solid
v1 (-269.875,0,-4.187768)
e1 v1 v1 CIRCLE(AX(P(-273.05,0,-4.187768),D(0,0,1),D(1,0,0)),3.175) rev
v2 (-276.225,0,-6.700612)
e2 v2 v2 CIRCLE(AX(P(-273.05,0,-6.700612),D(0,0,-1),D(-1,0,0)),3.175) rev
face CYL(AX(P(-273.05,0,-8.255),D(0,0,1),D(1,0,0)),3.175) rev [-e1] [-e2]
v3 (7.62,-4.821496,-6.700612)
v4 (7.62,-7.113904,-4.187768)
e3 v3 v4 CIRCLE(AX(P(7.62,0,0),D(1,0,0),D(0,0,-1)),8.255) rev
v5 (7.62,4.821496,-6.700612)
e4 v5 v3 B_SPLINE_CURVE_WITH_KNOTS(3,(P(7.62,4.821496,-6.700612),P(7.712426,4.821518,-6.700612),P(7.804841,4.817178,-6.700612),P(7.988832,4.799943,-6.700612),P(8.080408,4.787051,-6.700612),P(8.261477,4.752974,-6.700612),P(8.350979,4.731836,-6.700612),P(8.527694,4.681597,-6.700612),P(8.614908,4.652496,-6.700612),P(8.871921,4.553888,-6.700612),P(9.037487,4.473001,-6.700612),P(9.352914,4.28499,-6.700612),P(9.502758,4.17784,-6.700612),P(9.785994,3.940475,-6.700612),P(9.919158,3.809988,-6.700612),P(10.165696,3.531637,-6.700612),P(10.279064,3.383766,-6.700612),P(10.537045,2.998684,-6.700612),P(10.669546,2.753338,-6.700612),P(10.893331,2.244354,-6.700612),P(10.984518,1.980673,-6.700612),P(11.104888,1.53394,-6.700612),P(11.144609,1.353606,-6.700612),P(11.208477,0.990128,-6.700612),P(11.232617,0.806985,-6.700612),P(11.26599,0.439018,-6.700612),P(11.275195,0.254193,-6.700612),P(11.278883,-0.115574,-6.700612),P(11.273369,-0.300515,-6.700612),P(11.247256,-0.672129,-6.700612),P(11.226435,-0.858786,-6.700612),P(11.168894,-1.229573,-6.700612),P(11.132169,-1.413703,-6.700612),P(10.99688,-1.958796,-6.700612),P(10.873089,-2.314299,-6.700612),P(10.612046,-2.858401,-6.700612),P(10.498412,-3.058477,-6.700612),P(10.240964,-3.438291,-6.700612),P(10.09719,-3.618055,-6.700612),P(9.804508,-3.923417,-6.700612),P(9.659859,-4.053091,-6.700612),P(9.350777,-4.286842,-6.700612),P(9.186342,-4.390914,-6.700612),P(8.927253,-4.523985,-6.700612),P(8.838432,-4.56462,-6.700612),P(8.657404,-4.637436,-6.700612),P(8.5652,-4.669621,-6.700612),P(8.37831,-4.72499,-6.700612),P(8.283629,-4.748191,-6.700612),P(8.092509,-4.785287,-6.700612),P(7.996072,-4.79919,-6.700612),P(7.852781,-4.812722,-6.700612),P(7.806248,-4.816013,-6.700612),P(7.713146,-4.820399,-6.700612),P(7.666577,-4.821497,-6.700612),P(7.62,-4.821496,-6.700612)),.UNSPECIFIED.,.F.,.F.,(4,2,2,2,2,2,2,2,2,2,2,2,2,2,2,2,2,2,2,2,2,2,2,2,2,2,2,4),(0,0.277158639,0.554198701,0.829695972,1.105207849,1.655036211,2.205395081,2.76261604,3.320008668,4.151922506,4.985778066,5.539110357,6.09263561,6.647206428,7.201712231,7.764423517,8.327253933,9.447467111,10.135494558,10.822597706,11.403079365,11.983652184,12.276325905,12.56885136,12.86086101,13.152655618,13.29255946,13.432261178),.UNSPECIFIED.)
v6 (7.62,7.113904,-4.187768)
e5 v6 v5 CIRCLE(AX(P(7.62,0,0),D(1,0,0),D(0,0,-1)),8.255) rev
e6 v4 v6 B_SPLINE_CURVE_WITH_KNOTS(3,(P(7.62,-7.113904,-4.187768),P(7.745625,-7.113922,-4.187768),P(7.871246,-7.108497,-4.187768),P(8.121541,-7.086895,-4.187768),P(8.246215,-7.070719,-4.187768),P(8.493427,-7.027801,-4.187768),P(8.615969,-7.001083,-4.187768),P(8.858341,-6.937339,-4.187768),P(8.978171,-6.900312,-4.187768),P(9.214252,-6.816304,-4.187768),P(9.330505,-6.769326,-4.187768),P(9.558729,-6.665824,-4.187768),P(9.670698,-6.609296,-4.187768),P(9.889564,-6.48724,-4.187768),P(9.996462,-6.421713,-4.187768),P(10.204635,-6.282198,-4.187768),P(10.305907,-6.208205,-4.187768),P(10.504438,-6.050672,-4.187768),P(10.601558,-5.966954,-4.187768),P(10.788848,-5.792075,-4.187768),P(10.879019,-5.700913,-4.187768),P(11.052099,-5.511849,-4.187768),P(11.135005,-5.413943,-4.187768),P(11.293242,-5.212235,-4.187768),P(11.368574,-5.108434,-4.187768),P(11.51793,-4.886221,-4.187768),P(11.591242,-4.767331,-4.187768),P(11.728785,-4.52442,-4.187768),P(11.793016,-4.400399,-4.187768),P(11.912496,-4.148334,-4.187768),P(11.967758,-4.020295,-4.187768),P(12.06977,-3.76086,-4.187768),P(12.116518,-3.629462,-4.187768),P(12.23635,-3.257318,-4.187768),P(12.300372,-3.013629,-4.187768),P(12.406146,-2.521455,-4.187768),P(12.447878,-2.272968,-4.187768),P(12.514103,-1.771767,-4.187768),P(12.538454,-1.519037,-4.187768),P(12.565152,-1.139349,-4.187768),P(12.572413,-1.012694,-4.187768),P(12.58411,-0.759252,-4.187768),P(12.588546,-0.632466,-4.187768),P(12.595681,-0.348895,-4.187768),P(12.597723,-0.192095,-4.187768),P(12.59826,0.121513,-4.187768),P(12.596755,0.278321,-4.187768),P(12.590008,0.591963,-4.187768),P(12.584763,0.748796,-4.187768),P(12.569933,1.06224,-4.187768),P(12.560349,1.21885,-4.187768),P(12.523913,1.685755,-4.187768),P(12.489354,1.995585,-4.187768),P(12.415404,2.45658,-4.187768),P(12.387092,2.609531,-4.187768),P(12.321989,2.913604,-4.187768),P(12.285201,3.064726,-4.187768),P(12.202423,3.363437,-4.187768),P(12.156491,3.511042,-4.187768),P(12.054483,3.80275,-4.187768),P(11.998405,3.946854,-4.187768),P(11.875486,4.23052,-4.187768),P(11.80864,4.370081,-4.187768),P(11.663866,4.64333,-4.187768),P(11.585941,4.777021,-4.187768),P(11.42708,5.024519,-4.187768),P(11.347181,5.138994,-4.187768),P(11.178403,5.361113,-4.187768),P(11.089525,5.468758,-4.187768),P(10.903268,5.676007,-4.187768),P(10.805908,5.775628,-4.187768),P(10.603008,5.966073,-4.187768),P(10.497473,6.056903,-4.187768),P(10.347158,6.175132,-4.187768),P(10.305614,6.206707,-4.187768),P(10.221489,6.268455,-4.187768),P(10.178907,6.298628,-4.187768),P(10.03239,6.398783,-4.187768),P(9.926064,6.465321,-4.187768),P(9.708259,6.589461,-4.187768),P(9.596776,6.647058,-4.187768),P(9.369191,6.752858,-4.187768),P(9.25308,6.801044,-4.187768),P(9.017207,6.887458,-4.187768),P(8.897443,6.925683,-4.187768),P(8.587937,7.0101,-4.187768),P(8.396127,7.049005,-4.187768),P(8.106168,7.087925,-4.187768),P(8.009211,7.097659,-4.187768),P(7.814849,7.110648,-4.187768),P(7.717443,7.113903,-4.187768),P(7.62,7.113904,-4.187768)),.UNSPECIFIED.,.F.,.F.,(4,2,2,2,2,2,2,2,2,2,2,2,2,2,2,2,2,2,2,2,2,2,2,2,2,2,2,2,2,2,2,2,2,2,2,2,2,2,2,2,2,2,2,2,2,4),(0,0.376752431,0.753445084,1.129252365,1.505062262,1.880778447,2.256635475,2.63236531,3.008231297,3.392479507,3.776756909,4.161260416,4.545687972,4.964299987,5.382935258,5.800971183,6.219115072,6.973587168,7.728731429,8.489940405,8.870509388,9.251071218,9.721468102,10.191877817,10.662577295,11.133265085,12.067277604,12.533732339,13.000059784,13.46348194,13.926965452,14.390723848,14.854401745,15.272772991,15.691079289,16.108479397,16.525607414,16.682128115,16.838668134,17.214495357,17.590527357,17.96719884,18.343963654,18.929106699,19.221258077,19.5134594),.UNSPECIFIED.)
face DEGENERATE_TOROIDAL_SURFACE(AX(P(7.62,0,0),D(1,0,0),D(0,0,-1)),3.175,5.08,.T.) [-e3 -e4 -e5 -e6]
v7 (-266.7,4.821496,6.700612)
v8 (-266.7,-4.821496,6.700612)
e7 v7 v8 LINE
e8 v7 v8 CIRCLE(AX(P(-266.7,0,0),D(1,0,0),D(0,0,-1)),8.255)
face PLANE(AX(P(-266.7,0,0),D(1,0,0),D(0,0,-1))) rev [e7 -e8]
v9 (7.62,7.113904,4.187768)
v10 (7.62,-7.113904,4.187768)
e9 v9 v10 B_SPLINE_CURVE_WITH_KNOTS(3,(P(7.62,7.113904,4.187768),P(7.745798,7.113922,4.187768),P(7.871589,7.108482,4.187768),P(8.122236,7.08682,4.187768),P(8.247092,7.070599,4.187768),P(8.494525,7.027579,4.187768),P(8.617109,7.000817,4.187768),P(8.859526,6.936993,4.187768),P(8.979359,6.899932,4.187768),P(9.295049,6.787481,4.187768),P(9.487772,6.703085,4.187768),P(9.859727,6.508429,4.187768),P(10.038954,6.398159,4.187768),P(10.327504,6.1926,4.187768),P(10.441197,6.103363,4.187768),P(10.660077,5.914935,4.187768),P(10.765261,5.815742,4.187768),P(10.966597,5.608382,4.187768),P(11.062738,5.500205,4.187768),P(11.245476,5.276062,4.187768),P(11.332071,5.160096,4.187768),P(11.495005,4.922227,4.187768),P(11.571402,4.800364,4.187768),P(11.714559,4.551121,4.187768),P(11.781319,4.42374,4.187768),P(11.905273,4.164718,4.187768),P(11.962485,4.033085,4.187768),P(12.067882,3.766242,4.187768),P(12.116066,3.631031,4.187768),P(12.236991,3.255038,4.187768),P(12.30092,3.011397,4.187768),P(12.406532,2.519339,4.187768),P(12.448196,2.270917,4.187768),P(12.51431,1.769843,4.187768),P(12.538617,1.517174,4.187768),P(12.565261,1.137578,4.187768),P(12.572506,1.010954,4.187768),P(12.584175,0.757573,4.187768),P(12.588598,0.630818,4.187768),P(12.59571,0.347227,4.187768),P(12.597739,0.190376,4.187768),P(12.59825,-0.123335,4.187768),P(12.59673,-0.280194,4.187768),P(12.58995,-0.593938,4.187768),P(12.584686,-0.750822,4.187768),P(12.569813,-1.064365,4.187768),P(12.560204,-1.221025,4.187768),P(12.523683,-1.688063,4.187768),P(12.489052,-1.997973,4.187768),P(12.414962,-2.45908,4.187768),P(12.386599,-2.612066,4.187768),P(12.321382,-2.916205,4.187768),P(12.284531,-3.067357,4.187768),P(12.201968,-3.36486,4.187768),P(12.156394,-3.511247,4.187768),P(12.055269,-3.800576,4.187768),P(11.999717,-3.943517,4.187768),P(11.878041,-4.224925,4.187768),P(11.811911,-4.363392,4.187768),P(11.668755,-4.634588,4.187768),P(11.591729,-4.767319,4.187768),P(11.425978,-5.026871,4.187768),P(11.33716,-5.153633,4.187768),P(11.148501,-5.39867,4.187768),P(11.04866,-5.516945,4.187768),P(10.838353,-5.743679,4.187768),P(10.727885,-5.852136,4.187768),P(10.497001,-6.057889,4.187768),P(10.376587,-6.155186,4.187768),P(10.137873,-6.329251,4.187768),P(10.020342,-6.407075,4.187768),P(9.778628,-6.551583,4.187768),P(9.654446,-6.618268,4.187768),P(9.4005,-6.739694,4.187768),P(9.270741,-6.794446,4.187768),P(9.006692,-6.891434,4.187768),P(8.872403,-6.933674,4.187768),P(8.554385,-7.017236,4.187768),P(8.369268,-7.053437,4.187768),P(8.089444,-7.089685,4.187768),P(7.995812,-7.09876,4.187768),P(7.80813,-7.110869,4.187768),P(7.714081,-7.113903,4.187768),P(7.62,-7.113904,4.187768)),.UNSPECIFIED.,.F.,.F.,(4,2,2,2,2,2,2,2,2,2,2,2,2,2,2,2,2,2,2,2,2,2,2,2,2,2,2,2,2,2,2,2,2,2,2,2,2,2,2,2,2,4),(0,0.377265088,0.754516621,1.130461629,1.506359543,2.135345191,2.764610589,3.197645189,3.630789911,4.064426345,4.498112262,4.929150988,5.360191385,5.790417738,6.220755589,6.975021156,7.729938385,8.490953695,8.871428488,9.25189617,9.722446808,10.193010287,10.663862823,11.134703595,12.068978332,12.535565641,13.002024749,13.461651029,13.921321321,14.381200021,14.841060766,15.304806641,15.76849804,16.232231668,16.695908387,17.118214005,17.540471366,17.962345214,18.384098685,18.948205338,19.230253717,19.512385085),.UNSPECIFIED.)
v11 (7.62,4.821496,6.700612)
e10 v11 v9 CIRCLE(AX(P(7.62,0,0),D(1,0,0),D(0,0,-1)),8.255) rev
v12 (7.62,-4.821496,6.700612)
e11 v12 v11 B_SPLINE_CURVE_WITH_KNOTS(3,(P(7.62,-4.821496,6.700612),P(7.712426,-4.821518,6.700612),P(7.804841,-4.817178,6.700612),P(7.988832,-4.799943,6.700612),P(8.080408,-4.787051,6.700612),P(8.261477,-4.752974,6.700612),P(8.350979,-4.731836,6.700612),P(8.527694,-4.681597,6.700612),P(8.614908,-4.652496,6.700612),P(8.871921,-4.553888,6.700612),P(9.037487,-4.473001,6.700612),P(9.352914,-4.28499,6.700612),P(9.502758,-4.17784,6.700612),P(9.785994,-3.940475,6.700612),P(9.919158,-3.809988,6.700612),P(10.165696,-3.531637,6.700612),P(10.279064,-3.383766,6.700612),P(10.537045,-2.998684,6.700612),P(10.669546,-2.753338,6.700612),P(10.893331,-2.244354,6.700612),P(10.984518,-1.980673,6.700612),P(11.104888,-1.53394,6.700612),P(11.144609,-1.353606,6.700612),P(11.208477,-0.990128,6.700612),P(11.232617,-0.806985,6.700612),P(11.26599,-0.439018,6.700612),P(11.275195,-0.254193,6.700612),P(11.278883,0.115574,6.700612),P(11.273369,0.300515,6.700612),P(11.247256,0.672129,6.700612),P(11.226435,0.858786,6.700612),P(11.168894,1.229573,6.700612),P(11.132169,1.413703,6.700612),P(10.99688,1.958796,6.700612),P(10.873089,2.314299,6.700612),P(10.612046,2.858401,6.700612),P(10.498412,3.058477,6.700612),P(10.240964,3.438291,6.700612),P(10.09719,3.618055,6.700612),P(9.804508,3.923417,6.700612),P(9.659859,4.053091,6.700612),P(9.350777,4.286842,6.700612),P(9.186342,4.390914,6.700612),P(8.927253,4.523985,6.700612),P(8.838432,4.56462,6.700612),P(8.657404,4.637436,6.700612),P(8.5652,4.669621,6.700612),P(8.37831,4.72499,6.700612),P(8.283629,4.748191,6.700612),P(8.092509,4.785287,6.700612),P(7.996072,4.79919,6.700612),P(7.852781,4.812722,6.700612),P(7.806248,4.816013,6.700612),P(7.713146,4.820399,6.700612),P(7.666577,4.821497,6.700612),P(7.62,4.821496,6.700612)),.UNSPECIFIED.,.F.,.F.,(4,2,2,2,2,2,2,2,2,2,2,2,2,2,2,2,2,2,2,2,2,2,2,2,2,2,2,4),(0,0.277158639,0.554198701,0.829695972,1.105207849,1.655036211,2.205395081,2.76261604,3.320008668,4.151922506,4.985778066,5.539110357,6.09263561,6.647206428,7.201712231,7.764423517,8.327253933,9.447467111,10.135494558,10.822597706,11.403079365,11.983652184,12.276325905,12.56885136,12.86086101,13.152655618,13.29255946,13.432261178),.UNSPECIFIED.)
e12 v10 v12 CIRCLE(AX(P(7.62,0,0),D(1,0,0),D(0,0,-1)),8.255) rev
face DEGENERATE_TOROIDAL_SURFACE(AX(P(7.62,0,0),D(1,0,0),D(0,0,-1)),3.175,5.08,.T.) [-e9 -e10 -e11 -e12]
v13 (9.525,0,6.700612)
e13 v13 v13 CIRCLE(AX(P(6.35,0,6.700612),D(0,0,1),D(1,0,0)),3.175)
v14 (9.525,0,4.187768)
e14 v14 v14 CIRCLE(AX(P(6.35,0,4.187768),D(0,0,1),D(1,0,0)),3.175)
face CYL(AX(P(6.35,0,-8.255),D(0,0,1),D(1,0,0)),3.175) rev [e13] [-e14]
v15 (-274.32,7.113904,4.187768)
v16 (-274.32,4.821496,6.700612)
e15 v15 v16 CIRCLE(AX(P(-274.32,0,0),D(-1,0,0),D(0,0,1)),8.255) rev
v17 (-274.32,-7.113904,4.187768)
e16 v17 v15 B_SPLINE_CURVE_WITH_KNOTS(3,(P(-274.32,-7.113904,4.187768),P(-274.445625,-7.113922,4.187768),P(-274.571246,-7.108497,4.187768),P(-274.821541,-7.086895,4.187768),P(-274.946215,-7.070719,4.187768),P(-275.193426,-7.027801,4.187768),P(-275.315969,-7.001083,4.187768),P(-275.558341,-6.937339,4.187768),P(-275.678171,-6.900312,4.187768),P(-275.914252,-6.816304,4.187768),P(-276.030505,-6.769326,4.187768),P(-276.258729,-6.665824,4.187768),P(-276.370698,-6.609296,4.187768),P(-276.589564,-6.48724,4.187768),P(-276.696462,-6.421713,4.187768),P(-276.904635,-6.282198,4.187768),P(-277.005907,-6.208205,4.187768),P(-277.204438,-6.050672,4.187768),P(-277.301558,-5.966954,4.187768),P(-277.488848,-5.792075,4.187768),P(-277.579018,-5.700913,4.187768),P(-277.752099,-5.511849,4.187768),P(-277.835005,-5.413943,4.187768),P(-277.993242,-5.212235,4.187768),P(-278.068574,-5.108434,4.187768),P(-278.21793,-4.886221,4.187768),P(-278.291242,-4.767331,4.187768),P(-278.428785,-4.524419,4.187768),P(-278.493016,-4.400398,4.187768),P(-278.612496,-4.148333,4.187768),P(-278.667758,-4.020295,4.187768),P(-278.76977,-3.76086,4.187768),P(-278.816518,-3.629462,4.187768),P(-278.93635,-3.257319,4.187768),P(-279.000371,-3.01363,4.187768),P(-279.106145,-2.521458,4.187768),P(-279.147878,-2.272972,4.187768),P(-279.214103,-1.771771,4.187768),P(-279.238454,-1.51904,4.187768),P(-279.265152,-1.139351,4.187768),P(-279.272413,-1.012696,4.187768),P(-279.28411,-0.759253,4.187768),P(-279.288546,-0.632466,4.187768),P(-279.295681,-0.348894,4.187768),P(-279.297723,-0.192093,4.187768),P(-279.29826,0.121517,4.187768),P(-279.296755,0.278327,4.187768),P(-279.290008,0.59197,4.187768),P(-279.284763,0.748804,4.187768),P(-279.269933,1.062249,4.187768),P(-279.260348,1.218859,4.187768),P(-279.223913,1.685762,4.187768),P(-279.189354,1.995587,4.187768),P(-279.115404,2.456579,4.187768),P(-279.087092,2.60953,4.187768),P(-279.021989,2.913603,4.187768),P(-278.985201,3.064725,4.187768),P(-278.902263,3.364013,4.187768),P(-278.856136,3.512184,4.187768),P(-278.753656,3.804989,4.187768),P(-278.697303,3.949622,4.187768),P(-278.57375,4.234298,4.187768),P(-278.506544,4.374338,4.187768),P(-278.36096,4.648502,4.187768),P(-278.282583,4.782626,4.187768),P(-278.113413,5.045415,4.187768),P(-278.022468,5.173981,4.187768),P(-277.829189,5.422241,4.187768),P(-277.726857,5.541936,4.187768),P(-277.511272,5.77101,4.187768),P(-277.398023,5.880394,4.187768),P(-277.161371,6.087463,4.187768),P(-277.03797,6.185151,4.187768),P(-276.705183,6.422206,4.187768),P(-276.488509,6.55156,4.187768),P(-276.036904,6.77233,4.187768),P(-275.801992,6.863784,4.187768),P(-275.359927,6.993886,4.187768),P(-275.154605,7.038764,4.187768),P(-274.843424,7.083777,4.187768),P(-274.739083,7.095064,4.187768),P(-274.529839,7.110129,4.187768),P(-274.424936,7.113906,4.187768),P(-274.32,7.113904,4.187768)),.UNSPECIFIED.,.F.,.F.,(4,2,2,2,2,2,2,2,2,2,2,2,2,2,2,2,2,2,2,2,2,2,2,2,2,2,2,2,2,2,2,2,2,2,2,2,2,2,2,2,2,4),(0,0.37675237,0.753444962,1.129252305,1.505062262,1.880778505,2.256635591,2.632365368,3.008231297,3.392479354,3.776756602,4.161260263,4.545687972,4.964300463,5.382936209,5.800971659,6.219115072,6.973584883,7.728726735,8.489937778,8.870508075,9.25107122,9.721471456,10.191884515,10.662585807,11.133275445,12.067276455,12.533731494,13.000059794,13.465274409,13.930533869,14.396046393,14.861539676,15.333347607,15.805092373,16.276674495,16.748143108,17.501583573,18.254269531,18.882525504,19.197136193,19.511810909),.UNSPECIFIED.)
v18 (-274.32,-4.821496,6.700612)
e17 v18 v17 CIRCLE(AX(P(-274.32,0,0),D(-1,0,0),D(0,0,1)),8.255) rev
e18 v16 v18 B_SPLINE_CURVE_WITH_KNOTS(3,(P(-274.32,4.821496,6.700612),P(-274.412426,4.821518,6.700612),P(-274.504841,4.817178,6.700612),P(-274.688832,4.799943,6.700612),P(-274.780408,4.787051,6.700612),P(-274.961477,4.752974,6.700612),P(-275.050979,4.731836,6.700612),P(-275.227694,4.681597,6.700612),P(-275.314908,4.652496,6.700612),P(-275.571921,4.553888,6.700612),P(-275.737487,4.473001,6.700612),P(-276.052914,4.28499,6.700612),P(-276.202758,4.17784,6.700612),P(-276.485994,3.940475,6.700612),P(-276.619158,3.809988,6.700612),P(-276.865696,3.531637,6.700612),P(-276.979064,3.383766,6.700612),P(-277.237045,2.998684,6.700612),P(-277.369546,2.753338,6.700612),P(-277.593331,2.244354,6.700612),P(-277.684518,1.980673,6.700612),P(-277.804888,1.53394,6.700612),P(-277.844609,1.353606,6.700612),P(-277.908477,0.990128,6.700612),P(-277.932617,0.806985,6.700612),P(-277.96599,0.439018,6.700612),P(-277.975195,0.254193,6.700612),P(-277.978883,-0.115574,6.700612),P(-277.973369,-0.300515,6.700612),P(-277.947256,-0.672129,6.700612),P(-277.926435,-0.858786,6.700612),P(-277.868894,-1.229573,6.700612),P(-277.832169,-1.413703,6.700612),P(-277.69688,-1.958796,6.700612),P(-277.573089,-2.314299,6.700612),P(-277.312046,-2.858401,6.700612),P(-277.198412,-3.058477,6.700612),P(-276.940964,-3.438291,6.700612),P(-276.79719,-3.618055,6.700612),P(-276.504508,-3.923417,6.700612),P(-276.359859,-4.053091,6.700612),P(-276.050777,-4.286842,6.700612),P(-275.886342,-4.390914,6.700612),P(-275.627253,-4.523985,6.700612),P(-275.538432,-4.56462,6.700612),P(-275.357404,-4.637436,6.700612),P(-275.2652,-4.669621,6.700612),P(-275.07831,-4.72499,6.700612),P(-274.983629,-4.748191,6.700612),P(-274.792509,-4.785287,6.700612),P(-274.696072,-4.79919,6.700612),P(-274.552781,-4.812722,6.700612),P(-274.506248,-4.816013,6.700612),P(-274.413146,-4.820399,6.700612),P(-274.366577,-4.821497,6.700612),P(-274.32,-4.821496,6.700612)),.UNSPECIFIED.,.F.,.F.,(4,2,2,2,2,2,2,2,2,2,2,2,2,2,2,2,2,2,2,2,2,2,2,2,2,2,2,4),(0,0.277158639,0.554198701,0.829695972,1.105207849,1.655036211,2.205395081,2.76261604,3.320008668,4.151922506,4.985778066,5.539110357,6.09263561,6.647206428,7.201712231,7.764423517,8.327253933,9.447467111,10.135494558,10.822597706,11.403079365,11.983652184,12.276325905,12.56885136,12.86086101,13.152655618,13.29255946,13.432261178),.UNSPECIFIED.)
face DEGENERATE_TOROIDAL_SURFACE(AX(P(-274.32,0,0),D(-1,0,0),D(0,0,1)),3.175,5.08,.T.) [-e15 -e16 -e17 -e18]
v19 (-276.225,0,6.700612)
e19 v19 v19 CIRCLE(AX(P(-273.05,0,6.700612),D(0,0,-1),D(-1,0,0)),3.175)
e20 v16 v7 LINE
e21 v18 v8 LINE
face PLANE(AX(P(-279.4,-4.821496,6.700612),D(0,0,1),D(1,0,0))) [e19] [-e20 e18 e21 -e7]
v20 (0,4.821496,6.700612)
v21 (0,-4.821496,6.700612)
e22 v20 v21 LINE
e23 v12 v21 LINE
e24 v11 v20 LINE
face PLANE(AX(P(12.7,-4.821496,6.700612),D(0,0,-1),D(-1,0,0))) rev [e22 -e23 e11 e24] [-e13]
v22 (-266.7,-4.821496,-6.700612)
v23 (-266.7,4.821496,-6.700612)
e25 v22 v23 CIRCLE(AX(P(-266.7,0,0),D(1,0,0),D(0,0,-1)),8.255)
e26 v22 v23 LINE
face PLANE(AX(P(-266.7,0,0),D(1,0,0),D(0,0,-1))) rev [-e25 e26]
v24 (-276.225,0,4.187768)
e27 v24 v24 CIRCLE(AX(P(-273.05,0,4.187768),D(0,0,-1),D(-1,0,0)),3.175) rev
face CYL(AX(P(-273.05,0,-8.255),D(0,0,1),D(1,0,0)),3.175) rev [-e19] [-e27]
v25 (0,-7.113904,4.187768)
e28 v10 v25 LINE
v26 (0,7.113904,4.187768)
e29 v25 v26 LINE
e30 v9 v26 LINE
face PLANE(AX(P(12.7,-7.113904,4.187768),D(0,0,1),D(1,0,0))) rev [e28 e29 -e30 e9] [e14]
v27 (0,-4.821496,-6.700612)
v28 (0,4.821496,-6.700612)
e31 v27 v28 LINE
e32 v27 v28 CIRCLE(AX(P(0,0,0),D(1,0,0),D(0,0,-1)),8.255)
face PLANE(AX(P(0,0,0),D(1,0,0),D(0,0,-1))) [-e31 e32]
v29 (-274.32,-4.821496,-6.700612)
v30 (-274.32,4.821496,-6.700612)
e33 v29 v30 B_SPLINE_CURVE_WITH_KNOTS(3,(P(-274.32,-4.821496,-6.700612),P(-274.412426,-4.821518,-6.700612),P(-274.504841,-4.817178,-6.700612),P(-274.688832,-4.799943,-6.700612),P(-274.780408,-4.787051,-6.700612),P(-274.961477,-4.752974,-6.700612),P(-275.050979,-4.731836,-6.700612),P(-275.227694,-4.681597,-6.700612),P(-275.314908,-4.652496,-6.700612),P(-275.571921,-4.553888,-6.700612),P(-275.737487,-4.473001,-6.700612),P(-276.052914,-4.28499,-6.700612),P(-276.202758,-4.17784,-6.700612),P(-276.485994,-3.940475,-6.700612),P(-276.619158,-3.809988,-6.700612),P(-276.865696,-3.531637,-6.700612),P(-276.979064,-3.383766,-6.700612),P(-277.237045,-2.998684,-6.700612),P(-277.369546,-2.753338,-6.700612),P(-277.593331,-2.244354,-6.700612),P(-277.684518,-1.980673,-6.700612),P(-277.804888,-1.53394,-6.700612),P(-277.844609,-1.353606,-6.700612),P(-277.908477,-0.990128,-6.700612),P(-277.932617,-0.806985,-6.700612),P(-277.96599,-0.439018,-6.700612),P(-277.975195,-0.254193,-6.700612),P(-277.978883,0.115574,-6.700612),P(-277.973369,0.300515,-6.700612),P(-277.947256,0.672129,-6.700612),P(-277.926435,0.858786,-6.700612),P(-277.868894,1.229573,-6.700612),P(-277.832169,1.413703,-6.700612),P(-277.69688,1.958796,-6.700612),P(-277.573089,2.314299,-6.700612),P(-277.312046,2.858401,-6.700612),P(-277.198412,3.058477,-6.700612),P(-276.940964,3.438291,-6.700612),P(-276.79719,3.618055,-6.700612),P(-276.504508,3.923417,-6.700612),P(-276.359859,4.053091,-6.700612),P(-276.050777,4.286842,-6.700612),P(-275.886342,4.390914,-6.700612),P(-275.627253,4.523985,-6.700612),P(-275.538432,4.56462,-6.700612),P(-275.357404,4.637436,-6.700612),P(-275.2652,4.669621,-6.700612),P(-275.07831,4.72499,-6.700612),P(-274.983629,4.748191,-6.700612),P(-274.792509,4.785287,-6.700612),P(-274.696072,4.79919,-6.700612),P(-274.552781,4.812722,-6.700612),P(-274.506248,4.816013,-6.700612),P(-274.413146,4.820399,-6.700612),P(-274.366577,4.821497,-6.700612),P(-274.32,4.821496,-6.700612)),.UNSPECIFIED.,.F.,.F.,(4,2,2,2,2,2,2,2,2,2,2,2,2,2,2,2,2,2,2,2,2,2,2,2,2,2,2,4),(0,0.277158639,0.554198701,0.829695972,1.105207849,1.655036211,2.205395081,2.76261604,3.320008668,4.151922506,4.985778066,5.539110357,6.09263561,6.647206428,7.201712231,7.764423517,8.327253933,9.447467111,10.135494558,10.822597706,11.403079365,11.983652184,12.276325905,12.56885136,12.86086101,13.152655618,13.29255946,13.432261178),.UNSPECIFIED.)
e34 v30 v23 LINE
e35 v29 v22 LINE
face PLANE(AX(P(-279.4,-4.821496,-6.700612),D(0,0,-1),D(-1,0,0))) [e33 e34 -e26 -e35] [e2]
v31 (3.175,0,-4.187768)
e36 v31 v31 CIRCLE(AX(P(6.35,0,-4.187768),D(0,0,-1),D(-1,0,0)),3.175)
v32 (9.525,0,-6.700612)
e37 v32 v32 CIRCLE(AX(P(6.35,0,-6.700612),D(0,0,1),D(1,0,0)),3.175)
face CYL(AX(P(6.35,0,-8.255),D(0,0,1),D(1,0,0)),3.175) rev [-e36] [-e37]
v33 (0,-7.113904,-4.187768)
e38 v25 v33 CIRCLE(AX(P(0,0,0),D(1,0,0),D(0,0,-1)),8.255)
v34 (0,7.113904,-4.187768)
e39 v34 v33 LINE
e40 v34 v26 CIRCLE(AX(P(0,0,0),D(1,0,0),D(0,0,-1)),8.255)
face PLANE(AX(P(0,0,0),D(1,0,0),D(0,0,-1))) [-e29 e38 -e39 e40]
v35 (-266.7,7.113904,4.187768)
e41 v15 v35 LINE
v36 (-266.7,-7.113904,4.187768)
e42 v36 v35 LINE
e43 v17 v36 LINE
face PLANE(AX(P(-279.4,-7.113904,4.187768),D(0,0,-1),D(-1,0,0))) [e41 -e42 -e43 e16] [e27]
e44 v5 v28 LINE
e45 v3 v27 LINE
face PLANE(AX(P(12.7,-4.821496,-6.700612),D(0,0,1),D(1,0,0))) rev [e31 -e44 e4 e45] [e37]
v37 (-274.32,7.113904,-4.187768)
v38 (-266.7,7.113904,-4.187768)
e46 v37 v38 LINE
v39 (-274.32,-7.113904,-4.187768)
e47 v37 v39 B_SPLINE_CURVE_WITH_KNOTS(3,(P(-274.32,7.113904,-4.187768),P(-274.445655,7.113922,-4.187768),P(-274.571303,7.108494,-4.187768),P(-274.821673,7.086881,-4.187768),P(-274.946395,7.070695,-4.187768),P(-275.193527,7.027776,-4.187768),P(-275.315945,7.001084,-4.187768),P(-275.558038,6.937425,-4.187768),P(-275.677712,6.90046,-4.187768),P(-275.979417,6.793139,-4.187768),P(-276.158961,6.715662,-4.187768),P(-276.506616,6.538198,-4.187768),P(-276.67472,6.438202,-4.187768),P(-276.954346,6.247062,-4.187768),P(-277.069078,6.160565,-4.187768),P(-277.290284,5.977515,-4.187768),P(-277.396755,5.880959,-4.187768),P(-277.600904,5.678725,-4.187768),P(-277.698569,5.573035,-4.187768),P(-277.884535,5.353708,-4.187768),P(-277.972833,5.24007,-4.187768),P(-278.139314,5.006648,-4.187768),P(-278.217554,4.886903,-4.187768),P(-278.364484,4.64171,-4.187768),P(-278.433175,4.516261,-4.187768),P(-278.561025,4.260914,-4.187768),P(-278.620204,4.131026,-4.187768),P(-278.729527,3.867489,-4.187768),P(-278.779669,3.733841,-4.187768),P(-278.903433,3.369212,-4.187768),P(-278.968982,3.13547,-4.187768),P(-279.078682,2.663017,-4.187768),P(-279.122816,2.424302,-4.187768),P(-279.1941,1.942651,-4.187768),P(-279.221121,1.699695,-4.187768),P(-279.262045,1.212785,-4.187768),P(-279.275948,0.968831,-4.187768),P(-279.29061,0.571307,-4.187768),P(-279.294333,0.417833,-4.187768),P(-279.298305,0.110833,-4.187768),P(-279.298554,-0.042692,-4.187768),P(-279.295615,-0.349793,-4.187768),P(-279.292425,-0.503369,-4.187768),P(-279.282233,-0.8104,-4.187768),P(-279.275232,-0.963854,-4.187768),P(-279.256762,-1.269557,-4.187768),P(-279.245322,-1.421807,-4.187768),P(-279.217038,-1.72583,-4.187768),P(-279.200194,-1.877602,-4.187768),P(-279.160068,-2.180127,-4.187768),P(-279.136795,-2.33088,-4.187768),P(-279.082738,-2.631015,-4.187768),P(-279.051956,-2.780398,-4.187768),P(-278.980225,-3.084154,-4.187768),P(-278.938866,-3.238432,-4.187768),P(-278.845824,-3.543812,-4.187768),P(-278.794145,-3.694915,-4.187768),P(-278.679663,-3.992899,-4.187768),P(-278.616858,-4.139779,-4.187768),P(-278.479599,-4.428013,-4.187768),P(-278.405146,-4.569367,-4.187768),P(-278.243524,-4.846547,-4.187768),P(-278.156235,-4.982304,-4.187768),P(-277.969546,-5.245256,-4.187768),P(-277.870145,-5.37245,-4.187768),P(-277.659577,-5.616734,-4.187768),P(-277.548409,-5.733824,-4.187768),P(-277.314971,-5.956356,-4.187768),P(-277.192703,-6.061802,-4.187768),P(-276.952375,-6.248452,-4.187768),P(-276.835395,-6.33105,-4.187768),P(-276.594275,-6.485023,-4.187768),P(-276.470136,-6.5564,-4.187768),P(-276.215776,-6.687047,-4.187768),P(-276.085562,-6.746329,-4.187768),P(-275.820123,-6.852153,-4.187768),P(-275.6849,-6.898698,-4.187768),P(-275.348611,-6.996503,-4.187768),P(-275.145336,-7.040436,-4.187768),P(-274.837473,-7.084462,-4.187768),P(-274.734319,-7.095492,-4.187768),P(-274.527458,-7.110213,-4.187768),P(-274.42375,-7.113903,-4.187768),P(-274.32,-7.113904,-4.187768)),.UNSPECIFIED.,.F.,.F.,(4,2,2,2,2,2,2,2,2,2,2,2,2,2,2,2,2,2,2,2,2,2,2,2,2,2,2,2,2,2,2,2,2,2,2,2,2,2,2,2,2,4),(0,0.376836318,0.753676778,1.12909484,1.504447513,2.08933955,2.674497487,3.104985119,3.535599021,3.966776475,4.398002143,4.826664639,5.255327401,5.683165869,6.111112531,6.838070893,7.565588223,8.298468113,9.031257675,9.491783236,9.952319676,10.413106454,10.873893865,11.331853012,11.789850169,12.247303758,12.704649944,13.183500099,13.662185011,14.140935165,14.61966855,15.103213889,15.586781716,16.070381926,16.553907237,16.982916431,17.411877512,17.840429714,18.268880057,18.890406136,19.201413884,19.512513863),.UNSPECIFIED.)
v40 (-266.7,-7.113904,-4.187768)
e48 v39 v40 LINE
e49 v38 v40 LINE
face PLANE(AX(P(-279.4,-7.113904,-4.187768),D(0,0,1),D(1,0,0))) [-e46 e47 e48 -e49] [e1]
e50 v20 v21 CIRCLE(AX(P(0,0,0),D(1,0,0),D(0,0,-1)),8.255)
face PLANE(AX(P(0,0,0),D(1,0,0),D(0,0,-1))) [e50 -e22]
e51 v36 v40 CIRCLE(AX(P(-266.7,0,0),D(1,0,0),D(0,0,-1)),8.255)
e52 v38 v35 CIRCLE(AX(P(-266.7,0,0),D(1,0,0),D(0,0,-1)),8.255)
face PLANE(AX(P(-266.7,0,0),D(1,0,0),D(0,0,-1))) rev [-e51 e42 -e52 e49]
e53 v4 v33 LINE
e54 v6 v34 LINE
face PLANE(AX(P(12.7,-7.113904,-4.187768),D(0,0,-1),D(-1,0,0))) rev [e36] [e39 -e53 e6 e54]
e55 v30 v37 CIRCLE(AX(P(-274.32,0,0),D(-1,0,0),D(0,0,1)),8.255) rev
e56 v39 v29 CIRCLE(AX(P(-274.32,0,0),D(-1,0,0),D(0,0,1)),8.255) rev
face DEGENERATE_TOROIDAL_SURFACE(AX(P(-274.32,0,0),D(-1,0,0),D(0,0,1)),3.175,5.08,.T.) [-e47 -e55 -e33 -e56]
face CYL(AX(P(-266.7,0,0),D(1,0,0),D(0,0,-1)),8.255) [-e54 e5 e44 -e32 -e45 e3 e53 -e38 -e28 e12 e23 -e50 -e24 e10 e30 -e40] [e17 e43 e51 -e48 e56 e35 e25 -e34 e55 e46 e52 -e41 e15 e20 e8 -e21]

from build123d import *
from build123d.topology import SkipClean

# Parameters (mm, degrees)
SKETCH1_R            = 8.255
BOSS_EXTRUDE1_DEPTH  = 266.7
BOSS_EXTRUDE2_START  = 12.7
BOSS_EXTRUDE2_DEPTH  = 12.7
SKETCH5_R            = 3.175
CUT_EXTRUDE1_DEPTH   = 268.246525418
FILLET2_R            = 5.08
FILLET2_OF_MIRROR1_R = 5.08


with BuildPart() as part:
    # Sketch1 → Boss-Extrude1 (new body)
    with BuildSketch(Plane.YZ):
        with Locations(Location((0, 0, 0), (0, 0, 270))):
            Circle(SKETCH1_R)
    boss_extrude1 = extrude(amount=-BOSS_EXTRUDE1_DEPTH)

    # Sketch4 → Boss-Extrude2 (add)
    with SkipClean():  # the faces are left unmerged after this step: merging them gives an invalid solid
        with BuildSketch(Plane.YZ.offset(BOSS_EXTRUDE2_START)):
            with BuildLine():
                Line((-7.113903851, -4.187767543), (7.113903851, -4.187767543))
                ThreePointArc((7.113903851, -4.187767543), (6.098527778, -5.563540594), (4.821496361, -6.700611751))
                Line((4.821496361, -6.700611751), (-4.821496361, -6.700611751))
                ThreePointArc((-4.821496361, -6.700611751), (-6.098527778, -5.563540594), (-7.113903851, -4.187767543))
            make_face()
            with BuildLine():
                Line((-7.113903851, 4.187767543), (7.113903851, 4.187767543))
                ThreePointArc((7.113903851, 4.187767543), (6.098527778, 5.563540594), (4.821496361, 6.700611751))
                Line((4.821496361, 6.700611751), (-4.821496361, 6.700611751))
                ThreePointArc((-4.821496361, 6.700611751), (-6.098527778, 5.563540594), (-7.113903851, 4.187767543))
            make_face()
        boss_extrude2 = extrude(amount=-BOSS_EXTRUDE2_DEPTH)

    # Sketch5 → Cut-Extrude1 (cut, through all)
    with SkipClean():  # the faces are left unmerged after this step: merging them gives an invalid solid
        with BuildSketch(Plane.XY.offset(6.700611751)):
            with Locations((6.35, 0)):
                Circle(SKETCH5_R)
        cut_extrude1 = extrude(amount=-CUT_EXTRUDE1_DEPTH, mode=Mode.SUBTRACT)

    # Fillet2
    # the kernel refuses this fillet: 5.08 mm, written as the material it takes off along each edge
    with BuildSketch(Plane(origin=(12.7, 0, 0), x_dir=(0, 0.7924229506159141, -0.6099720217658908), z_dir=(0, 0.6099720217658908, 0.7924229506159141))) as fillet2_piece_1:
        with BuildLine():
            CenterArc((8.255 - FILLET2_R, FILLET2_R), FILLET2_R, 270, 90)
            Line((8.255 - FILLET2_R, 0), (8.255, 0))
            Line((8.255, 0), (8.255, FILLET2_R))
        make_face()
    revolve(axis=Axis((12.7, 0, 0), (-1, 0, 0)), revolution_arc=200.07814468, mode=Mode.SUBTRACT)
    with BuildSketch(Plane(origin=(12.7, 0, 0), x_dir=(0, 0.534859378845264, 0.8449410895803674), z_dir=(0, -0.8449410895803674, 0.534859378845264))) as fillet2_piece_2:
        with BuildLine():
            CenterArc((8.255 - FILLET2_R, FILLET2_R), FILLET2_R, 270, 90)
            Line((8.255 - FILLET2_R, 0), (8.255, 0))
            Line((8.255, 0), (8.255, FILLET2_R))
        make_face()
    revolve(axis=Axis((12.7, 0, 0), (-1, 0, 0)), revolution_arc=200.07814468, mode=Mode.SUBTRACT)
    with BuildSketch(Plane(origin=(12.7, 0, 0), x_dir=(0, 0.7924229506159125, 0.6099720217658933), z_dir=(0, 0.6099720217658933, -0.7924229506159125))) as fillet2_piece_3:
        with BuildLine():
            CenterArc((8.255 - FILLET2_R, -FILLET2_R), FILLET2_R, 0, 90)
            Line((8.255 - FILLET2_R, 0), (8.255, 0))
            Line((8.255, 0), (8.255, -FILLET2_R))
        make_face()
    revolve(axis=Axis((12.7, 0, 0), (1, 0, 0)), revolution_arc=200.07814468, mode=Mode.SUBTRACT)
    with BuildSketch(Plane(origin=(12.7, 0, 0), x_dir=(0, 0.534859378845264, -0.8449410895803674), z_dir=(0, -0.8449410895803674, -0.534859378845264))) as fillet2_piece_4:
        with BuildLine():
            CenterArc((8.255 - FILLET2_R, -FILLET2_R), FILLET2_R, 0, 90)
            Line((8.255 - FILLET2_R, 0), (8.255, 0))
            Line((8.255, 0), (8.255, -FILLET2_R))
        make_face()
    revolve(axis=Axis((12.7, 0, 0), (1, 0, 0)), revolution_arc=200.07814468, mode=Mode.SUBTRACT)

    # Mirror1: Boss-Extrude1, Boss-Extrude2, Cut-Extrude1 across plane
    add(boss_extrude1.mirror(Plane(origin=(-133.35, 0, 0), x_dir=(0, 0, 1), z_dir=(1, 0, 0))))
    add(boss_extrude2.mirror(Plane(origin=(-133.35, 0, 0), x_dir=(0, 0, 1), z_dir=(1, 0, 0))))
    add(cut_extrude1.mirror(Plane(origin=(-133.35, 0, 0), x_dir=(0, 0, 1), z_dir=(1, 0, 0))), mode=Mode.SUBTRACT)

    # Fillet2 of Mirror1
    # the kernel refuses this fillet: 5.08 mm, written as the material it takes off along each edge
    with BuildSketch(Plane(origin=(-279.4, 0, 0), x_dir=(0, 0.7924229506159141, -0.6099720217658908), z_dir=(0, 0.6099720217658908, 0.7924229506159141))) as fillet2_of_mirror1_piece_1:
        with BuildLine():
            CenterArc((8.255 - FILLET2_OF_MIRROR1_R, -FILLET2_OF_MIRROR1_R), FILLET2_OF_MIRROR1_R, 0, 90)
            Line((8.255 - FILLET2_OF_MIRROR1_R, 0), (8.255, 0))
            Line((8.255, 0), (8.255, -FILLET2_OF_MIRROR1_R))
        make_face()
    revolve(axis=Axis((-279.4, 0, 0), (-1, 0, 0)), revolution_arc=200.07814468, mode=Mode.SUBTRACT)
    with BuildSketch(Plane(origin=(-279.4, 0, 0), x_dir=(0, 0.534859378845264, 0.8449410895803674), z_dir=(0, -0.8449410895803674, 0.534859378845264))) as fillet2_of_mirror1_piece_2:
        with BuildLine():
            CenterArc((8.255 - FILLET2_OF_MIRROR1_R, -FILLET2_OF_MIRROR1_R), FILLET2_OF_MIRROR1_R, 0, 90)
            Line((8.255 - FILLET2_OF_MIRROR1_R, 0), (8.255, 0))
            Line((8.255, 0), (8.255, -FILLET2_OF_MIRROR1_R))
        make_face()
    revolve(axis=Axis((-279.4, 0, 0), (-1, 0, 0)), revolution_arc=200.07814468, mode=Mode.SUBTRACT)
    with BuildSketch(Plane(origin=(-279.4, 0, 0), x_dir=(0, 0.7924229506159125, 0.6099720217658933), z_dir=(0, 0.6099720217658933, -0.7924229506159125))) as fillet2_of_mirror1_piece_3:
        with BuildLine():
            CenterArc((8.255 - FILLET2_OF_MIRROR1_R, FILLET2_OF_MIRROR1_R), FILLET2_OF_MIRROR1_R, 270, 90)
            Line((8.255 - FILLET2_OF_MIRROR1_R, 0), (8.255, 0))
            Line((8.255, 0), (8.255, FILLET2_OF_MIRROR1_R))
        make_face()
    revolve(axis=Axis((-279.4, 0, 0), (1, 0, 0)), revolution_arc=200.07814468, mode=Mode.SUBTRACT)
    with BuildSketch(Plane(origin=(-279.4, 0, 0), x_dir=(0, 0.534859378845264, -0.8449410895803674), z_dir=(0, -0.8449410895803674, -0.534859378845264))) as fillet2_of_mirror1_piece_4:
        with BuildLine():
            CenterArc((8.255 - FILLET2_OF_MIRROR1_R, FILLET2_OF_MIRROR1_R), FILLET2_OF_MIRROR1_R, 270, 90)
            Line((8.255 - FILLET2_OF_MIRROR1_R, 0), (8.255, 0))
            Line((8.255, 0), (8.255, FILLET2_OF_MIRROR1_R))
        make_face()
    revolve(axis=Axis((-279.4, 0, 0), (1, 0, 0)), revolution_arc=200.07814468, mode=Mode.SUBTRACT)


solid = part.part
